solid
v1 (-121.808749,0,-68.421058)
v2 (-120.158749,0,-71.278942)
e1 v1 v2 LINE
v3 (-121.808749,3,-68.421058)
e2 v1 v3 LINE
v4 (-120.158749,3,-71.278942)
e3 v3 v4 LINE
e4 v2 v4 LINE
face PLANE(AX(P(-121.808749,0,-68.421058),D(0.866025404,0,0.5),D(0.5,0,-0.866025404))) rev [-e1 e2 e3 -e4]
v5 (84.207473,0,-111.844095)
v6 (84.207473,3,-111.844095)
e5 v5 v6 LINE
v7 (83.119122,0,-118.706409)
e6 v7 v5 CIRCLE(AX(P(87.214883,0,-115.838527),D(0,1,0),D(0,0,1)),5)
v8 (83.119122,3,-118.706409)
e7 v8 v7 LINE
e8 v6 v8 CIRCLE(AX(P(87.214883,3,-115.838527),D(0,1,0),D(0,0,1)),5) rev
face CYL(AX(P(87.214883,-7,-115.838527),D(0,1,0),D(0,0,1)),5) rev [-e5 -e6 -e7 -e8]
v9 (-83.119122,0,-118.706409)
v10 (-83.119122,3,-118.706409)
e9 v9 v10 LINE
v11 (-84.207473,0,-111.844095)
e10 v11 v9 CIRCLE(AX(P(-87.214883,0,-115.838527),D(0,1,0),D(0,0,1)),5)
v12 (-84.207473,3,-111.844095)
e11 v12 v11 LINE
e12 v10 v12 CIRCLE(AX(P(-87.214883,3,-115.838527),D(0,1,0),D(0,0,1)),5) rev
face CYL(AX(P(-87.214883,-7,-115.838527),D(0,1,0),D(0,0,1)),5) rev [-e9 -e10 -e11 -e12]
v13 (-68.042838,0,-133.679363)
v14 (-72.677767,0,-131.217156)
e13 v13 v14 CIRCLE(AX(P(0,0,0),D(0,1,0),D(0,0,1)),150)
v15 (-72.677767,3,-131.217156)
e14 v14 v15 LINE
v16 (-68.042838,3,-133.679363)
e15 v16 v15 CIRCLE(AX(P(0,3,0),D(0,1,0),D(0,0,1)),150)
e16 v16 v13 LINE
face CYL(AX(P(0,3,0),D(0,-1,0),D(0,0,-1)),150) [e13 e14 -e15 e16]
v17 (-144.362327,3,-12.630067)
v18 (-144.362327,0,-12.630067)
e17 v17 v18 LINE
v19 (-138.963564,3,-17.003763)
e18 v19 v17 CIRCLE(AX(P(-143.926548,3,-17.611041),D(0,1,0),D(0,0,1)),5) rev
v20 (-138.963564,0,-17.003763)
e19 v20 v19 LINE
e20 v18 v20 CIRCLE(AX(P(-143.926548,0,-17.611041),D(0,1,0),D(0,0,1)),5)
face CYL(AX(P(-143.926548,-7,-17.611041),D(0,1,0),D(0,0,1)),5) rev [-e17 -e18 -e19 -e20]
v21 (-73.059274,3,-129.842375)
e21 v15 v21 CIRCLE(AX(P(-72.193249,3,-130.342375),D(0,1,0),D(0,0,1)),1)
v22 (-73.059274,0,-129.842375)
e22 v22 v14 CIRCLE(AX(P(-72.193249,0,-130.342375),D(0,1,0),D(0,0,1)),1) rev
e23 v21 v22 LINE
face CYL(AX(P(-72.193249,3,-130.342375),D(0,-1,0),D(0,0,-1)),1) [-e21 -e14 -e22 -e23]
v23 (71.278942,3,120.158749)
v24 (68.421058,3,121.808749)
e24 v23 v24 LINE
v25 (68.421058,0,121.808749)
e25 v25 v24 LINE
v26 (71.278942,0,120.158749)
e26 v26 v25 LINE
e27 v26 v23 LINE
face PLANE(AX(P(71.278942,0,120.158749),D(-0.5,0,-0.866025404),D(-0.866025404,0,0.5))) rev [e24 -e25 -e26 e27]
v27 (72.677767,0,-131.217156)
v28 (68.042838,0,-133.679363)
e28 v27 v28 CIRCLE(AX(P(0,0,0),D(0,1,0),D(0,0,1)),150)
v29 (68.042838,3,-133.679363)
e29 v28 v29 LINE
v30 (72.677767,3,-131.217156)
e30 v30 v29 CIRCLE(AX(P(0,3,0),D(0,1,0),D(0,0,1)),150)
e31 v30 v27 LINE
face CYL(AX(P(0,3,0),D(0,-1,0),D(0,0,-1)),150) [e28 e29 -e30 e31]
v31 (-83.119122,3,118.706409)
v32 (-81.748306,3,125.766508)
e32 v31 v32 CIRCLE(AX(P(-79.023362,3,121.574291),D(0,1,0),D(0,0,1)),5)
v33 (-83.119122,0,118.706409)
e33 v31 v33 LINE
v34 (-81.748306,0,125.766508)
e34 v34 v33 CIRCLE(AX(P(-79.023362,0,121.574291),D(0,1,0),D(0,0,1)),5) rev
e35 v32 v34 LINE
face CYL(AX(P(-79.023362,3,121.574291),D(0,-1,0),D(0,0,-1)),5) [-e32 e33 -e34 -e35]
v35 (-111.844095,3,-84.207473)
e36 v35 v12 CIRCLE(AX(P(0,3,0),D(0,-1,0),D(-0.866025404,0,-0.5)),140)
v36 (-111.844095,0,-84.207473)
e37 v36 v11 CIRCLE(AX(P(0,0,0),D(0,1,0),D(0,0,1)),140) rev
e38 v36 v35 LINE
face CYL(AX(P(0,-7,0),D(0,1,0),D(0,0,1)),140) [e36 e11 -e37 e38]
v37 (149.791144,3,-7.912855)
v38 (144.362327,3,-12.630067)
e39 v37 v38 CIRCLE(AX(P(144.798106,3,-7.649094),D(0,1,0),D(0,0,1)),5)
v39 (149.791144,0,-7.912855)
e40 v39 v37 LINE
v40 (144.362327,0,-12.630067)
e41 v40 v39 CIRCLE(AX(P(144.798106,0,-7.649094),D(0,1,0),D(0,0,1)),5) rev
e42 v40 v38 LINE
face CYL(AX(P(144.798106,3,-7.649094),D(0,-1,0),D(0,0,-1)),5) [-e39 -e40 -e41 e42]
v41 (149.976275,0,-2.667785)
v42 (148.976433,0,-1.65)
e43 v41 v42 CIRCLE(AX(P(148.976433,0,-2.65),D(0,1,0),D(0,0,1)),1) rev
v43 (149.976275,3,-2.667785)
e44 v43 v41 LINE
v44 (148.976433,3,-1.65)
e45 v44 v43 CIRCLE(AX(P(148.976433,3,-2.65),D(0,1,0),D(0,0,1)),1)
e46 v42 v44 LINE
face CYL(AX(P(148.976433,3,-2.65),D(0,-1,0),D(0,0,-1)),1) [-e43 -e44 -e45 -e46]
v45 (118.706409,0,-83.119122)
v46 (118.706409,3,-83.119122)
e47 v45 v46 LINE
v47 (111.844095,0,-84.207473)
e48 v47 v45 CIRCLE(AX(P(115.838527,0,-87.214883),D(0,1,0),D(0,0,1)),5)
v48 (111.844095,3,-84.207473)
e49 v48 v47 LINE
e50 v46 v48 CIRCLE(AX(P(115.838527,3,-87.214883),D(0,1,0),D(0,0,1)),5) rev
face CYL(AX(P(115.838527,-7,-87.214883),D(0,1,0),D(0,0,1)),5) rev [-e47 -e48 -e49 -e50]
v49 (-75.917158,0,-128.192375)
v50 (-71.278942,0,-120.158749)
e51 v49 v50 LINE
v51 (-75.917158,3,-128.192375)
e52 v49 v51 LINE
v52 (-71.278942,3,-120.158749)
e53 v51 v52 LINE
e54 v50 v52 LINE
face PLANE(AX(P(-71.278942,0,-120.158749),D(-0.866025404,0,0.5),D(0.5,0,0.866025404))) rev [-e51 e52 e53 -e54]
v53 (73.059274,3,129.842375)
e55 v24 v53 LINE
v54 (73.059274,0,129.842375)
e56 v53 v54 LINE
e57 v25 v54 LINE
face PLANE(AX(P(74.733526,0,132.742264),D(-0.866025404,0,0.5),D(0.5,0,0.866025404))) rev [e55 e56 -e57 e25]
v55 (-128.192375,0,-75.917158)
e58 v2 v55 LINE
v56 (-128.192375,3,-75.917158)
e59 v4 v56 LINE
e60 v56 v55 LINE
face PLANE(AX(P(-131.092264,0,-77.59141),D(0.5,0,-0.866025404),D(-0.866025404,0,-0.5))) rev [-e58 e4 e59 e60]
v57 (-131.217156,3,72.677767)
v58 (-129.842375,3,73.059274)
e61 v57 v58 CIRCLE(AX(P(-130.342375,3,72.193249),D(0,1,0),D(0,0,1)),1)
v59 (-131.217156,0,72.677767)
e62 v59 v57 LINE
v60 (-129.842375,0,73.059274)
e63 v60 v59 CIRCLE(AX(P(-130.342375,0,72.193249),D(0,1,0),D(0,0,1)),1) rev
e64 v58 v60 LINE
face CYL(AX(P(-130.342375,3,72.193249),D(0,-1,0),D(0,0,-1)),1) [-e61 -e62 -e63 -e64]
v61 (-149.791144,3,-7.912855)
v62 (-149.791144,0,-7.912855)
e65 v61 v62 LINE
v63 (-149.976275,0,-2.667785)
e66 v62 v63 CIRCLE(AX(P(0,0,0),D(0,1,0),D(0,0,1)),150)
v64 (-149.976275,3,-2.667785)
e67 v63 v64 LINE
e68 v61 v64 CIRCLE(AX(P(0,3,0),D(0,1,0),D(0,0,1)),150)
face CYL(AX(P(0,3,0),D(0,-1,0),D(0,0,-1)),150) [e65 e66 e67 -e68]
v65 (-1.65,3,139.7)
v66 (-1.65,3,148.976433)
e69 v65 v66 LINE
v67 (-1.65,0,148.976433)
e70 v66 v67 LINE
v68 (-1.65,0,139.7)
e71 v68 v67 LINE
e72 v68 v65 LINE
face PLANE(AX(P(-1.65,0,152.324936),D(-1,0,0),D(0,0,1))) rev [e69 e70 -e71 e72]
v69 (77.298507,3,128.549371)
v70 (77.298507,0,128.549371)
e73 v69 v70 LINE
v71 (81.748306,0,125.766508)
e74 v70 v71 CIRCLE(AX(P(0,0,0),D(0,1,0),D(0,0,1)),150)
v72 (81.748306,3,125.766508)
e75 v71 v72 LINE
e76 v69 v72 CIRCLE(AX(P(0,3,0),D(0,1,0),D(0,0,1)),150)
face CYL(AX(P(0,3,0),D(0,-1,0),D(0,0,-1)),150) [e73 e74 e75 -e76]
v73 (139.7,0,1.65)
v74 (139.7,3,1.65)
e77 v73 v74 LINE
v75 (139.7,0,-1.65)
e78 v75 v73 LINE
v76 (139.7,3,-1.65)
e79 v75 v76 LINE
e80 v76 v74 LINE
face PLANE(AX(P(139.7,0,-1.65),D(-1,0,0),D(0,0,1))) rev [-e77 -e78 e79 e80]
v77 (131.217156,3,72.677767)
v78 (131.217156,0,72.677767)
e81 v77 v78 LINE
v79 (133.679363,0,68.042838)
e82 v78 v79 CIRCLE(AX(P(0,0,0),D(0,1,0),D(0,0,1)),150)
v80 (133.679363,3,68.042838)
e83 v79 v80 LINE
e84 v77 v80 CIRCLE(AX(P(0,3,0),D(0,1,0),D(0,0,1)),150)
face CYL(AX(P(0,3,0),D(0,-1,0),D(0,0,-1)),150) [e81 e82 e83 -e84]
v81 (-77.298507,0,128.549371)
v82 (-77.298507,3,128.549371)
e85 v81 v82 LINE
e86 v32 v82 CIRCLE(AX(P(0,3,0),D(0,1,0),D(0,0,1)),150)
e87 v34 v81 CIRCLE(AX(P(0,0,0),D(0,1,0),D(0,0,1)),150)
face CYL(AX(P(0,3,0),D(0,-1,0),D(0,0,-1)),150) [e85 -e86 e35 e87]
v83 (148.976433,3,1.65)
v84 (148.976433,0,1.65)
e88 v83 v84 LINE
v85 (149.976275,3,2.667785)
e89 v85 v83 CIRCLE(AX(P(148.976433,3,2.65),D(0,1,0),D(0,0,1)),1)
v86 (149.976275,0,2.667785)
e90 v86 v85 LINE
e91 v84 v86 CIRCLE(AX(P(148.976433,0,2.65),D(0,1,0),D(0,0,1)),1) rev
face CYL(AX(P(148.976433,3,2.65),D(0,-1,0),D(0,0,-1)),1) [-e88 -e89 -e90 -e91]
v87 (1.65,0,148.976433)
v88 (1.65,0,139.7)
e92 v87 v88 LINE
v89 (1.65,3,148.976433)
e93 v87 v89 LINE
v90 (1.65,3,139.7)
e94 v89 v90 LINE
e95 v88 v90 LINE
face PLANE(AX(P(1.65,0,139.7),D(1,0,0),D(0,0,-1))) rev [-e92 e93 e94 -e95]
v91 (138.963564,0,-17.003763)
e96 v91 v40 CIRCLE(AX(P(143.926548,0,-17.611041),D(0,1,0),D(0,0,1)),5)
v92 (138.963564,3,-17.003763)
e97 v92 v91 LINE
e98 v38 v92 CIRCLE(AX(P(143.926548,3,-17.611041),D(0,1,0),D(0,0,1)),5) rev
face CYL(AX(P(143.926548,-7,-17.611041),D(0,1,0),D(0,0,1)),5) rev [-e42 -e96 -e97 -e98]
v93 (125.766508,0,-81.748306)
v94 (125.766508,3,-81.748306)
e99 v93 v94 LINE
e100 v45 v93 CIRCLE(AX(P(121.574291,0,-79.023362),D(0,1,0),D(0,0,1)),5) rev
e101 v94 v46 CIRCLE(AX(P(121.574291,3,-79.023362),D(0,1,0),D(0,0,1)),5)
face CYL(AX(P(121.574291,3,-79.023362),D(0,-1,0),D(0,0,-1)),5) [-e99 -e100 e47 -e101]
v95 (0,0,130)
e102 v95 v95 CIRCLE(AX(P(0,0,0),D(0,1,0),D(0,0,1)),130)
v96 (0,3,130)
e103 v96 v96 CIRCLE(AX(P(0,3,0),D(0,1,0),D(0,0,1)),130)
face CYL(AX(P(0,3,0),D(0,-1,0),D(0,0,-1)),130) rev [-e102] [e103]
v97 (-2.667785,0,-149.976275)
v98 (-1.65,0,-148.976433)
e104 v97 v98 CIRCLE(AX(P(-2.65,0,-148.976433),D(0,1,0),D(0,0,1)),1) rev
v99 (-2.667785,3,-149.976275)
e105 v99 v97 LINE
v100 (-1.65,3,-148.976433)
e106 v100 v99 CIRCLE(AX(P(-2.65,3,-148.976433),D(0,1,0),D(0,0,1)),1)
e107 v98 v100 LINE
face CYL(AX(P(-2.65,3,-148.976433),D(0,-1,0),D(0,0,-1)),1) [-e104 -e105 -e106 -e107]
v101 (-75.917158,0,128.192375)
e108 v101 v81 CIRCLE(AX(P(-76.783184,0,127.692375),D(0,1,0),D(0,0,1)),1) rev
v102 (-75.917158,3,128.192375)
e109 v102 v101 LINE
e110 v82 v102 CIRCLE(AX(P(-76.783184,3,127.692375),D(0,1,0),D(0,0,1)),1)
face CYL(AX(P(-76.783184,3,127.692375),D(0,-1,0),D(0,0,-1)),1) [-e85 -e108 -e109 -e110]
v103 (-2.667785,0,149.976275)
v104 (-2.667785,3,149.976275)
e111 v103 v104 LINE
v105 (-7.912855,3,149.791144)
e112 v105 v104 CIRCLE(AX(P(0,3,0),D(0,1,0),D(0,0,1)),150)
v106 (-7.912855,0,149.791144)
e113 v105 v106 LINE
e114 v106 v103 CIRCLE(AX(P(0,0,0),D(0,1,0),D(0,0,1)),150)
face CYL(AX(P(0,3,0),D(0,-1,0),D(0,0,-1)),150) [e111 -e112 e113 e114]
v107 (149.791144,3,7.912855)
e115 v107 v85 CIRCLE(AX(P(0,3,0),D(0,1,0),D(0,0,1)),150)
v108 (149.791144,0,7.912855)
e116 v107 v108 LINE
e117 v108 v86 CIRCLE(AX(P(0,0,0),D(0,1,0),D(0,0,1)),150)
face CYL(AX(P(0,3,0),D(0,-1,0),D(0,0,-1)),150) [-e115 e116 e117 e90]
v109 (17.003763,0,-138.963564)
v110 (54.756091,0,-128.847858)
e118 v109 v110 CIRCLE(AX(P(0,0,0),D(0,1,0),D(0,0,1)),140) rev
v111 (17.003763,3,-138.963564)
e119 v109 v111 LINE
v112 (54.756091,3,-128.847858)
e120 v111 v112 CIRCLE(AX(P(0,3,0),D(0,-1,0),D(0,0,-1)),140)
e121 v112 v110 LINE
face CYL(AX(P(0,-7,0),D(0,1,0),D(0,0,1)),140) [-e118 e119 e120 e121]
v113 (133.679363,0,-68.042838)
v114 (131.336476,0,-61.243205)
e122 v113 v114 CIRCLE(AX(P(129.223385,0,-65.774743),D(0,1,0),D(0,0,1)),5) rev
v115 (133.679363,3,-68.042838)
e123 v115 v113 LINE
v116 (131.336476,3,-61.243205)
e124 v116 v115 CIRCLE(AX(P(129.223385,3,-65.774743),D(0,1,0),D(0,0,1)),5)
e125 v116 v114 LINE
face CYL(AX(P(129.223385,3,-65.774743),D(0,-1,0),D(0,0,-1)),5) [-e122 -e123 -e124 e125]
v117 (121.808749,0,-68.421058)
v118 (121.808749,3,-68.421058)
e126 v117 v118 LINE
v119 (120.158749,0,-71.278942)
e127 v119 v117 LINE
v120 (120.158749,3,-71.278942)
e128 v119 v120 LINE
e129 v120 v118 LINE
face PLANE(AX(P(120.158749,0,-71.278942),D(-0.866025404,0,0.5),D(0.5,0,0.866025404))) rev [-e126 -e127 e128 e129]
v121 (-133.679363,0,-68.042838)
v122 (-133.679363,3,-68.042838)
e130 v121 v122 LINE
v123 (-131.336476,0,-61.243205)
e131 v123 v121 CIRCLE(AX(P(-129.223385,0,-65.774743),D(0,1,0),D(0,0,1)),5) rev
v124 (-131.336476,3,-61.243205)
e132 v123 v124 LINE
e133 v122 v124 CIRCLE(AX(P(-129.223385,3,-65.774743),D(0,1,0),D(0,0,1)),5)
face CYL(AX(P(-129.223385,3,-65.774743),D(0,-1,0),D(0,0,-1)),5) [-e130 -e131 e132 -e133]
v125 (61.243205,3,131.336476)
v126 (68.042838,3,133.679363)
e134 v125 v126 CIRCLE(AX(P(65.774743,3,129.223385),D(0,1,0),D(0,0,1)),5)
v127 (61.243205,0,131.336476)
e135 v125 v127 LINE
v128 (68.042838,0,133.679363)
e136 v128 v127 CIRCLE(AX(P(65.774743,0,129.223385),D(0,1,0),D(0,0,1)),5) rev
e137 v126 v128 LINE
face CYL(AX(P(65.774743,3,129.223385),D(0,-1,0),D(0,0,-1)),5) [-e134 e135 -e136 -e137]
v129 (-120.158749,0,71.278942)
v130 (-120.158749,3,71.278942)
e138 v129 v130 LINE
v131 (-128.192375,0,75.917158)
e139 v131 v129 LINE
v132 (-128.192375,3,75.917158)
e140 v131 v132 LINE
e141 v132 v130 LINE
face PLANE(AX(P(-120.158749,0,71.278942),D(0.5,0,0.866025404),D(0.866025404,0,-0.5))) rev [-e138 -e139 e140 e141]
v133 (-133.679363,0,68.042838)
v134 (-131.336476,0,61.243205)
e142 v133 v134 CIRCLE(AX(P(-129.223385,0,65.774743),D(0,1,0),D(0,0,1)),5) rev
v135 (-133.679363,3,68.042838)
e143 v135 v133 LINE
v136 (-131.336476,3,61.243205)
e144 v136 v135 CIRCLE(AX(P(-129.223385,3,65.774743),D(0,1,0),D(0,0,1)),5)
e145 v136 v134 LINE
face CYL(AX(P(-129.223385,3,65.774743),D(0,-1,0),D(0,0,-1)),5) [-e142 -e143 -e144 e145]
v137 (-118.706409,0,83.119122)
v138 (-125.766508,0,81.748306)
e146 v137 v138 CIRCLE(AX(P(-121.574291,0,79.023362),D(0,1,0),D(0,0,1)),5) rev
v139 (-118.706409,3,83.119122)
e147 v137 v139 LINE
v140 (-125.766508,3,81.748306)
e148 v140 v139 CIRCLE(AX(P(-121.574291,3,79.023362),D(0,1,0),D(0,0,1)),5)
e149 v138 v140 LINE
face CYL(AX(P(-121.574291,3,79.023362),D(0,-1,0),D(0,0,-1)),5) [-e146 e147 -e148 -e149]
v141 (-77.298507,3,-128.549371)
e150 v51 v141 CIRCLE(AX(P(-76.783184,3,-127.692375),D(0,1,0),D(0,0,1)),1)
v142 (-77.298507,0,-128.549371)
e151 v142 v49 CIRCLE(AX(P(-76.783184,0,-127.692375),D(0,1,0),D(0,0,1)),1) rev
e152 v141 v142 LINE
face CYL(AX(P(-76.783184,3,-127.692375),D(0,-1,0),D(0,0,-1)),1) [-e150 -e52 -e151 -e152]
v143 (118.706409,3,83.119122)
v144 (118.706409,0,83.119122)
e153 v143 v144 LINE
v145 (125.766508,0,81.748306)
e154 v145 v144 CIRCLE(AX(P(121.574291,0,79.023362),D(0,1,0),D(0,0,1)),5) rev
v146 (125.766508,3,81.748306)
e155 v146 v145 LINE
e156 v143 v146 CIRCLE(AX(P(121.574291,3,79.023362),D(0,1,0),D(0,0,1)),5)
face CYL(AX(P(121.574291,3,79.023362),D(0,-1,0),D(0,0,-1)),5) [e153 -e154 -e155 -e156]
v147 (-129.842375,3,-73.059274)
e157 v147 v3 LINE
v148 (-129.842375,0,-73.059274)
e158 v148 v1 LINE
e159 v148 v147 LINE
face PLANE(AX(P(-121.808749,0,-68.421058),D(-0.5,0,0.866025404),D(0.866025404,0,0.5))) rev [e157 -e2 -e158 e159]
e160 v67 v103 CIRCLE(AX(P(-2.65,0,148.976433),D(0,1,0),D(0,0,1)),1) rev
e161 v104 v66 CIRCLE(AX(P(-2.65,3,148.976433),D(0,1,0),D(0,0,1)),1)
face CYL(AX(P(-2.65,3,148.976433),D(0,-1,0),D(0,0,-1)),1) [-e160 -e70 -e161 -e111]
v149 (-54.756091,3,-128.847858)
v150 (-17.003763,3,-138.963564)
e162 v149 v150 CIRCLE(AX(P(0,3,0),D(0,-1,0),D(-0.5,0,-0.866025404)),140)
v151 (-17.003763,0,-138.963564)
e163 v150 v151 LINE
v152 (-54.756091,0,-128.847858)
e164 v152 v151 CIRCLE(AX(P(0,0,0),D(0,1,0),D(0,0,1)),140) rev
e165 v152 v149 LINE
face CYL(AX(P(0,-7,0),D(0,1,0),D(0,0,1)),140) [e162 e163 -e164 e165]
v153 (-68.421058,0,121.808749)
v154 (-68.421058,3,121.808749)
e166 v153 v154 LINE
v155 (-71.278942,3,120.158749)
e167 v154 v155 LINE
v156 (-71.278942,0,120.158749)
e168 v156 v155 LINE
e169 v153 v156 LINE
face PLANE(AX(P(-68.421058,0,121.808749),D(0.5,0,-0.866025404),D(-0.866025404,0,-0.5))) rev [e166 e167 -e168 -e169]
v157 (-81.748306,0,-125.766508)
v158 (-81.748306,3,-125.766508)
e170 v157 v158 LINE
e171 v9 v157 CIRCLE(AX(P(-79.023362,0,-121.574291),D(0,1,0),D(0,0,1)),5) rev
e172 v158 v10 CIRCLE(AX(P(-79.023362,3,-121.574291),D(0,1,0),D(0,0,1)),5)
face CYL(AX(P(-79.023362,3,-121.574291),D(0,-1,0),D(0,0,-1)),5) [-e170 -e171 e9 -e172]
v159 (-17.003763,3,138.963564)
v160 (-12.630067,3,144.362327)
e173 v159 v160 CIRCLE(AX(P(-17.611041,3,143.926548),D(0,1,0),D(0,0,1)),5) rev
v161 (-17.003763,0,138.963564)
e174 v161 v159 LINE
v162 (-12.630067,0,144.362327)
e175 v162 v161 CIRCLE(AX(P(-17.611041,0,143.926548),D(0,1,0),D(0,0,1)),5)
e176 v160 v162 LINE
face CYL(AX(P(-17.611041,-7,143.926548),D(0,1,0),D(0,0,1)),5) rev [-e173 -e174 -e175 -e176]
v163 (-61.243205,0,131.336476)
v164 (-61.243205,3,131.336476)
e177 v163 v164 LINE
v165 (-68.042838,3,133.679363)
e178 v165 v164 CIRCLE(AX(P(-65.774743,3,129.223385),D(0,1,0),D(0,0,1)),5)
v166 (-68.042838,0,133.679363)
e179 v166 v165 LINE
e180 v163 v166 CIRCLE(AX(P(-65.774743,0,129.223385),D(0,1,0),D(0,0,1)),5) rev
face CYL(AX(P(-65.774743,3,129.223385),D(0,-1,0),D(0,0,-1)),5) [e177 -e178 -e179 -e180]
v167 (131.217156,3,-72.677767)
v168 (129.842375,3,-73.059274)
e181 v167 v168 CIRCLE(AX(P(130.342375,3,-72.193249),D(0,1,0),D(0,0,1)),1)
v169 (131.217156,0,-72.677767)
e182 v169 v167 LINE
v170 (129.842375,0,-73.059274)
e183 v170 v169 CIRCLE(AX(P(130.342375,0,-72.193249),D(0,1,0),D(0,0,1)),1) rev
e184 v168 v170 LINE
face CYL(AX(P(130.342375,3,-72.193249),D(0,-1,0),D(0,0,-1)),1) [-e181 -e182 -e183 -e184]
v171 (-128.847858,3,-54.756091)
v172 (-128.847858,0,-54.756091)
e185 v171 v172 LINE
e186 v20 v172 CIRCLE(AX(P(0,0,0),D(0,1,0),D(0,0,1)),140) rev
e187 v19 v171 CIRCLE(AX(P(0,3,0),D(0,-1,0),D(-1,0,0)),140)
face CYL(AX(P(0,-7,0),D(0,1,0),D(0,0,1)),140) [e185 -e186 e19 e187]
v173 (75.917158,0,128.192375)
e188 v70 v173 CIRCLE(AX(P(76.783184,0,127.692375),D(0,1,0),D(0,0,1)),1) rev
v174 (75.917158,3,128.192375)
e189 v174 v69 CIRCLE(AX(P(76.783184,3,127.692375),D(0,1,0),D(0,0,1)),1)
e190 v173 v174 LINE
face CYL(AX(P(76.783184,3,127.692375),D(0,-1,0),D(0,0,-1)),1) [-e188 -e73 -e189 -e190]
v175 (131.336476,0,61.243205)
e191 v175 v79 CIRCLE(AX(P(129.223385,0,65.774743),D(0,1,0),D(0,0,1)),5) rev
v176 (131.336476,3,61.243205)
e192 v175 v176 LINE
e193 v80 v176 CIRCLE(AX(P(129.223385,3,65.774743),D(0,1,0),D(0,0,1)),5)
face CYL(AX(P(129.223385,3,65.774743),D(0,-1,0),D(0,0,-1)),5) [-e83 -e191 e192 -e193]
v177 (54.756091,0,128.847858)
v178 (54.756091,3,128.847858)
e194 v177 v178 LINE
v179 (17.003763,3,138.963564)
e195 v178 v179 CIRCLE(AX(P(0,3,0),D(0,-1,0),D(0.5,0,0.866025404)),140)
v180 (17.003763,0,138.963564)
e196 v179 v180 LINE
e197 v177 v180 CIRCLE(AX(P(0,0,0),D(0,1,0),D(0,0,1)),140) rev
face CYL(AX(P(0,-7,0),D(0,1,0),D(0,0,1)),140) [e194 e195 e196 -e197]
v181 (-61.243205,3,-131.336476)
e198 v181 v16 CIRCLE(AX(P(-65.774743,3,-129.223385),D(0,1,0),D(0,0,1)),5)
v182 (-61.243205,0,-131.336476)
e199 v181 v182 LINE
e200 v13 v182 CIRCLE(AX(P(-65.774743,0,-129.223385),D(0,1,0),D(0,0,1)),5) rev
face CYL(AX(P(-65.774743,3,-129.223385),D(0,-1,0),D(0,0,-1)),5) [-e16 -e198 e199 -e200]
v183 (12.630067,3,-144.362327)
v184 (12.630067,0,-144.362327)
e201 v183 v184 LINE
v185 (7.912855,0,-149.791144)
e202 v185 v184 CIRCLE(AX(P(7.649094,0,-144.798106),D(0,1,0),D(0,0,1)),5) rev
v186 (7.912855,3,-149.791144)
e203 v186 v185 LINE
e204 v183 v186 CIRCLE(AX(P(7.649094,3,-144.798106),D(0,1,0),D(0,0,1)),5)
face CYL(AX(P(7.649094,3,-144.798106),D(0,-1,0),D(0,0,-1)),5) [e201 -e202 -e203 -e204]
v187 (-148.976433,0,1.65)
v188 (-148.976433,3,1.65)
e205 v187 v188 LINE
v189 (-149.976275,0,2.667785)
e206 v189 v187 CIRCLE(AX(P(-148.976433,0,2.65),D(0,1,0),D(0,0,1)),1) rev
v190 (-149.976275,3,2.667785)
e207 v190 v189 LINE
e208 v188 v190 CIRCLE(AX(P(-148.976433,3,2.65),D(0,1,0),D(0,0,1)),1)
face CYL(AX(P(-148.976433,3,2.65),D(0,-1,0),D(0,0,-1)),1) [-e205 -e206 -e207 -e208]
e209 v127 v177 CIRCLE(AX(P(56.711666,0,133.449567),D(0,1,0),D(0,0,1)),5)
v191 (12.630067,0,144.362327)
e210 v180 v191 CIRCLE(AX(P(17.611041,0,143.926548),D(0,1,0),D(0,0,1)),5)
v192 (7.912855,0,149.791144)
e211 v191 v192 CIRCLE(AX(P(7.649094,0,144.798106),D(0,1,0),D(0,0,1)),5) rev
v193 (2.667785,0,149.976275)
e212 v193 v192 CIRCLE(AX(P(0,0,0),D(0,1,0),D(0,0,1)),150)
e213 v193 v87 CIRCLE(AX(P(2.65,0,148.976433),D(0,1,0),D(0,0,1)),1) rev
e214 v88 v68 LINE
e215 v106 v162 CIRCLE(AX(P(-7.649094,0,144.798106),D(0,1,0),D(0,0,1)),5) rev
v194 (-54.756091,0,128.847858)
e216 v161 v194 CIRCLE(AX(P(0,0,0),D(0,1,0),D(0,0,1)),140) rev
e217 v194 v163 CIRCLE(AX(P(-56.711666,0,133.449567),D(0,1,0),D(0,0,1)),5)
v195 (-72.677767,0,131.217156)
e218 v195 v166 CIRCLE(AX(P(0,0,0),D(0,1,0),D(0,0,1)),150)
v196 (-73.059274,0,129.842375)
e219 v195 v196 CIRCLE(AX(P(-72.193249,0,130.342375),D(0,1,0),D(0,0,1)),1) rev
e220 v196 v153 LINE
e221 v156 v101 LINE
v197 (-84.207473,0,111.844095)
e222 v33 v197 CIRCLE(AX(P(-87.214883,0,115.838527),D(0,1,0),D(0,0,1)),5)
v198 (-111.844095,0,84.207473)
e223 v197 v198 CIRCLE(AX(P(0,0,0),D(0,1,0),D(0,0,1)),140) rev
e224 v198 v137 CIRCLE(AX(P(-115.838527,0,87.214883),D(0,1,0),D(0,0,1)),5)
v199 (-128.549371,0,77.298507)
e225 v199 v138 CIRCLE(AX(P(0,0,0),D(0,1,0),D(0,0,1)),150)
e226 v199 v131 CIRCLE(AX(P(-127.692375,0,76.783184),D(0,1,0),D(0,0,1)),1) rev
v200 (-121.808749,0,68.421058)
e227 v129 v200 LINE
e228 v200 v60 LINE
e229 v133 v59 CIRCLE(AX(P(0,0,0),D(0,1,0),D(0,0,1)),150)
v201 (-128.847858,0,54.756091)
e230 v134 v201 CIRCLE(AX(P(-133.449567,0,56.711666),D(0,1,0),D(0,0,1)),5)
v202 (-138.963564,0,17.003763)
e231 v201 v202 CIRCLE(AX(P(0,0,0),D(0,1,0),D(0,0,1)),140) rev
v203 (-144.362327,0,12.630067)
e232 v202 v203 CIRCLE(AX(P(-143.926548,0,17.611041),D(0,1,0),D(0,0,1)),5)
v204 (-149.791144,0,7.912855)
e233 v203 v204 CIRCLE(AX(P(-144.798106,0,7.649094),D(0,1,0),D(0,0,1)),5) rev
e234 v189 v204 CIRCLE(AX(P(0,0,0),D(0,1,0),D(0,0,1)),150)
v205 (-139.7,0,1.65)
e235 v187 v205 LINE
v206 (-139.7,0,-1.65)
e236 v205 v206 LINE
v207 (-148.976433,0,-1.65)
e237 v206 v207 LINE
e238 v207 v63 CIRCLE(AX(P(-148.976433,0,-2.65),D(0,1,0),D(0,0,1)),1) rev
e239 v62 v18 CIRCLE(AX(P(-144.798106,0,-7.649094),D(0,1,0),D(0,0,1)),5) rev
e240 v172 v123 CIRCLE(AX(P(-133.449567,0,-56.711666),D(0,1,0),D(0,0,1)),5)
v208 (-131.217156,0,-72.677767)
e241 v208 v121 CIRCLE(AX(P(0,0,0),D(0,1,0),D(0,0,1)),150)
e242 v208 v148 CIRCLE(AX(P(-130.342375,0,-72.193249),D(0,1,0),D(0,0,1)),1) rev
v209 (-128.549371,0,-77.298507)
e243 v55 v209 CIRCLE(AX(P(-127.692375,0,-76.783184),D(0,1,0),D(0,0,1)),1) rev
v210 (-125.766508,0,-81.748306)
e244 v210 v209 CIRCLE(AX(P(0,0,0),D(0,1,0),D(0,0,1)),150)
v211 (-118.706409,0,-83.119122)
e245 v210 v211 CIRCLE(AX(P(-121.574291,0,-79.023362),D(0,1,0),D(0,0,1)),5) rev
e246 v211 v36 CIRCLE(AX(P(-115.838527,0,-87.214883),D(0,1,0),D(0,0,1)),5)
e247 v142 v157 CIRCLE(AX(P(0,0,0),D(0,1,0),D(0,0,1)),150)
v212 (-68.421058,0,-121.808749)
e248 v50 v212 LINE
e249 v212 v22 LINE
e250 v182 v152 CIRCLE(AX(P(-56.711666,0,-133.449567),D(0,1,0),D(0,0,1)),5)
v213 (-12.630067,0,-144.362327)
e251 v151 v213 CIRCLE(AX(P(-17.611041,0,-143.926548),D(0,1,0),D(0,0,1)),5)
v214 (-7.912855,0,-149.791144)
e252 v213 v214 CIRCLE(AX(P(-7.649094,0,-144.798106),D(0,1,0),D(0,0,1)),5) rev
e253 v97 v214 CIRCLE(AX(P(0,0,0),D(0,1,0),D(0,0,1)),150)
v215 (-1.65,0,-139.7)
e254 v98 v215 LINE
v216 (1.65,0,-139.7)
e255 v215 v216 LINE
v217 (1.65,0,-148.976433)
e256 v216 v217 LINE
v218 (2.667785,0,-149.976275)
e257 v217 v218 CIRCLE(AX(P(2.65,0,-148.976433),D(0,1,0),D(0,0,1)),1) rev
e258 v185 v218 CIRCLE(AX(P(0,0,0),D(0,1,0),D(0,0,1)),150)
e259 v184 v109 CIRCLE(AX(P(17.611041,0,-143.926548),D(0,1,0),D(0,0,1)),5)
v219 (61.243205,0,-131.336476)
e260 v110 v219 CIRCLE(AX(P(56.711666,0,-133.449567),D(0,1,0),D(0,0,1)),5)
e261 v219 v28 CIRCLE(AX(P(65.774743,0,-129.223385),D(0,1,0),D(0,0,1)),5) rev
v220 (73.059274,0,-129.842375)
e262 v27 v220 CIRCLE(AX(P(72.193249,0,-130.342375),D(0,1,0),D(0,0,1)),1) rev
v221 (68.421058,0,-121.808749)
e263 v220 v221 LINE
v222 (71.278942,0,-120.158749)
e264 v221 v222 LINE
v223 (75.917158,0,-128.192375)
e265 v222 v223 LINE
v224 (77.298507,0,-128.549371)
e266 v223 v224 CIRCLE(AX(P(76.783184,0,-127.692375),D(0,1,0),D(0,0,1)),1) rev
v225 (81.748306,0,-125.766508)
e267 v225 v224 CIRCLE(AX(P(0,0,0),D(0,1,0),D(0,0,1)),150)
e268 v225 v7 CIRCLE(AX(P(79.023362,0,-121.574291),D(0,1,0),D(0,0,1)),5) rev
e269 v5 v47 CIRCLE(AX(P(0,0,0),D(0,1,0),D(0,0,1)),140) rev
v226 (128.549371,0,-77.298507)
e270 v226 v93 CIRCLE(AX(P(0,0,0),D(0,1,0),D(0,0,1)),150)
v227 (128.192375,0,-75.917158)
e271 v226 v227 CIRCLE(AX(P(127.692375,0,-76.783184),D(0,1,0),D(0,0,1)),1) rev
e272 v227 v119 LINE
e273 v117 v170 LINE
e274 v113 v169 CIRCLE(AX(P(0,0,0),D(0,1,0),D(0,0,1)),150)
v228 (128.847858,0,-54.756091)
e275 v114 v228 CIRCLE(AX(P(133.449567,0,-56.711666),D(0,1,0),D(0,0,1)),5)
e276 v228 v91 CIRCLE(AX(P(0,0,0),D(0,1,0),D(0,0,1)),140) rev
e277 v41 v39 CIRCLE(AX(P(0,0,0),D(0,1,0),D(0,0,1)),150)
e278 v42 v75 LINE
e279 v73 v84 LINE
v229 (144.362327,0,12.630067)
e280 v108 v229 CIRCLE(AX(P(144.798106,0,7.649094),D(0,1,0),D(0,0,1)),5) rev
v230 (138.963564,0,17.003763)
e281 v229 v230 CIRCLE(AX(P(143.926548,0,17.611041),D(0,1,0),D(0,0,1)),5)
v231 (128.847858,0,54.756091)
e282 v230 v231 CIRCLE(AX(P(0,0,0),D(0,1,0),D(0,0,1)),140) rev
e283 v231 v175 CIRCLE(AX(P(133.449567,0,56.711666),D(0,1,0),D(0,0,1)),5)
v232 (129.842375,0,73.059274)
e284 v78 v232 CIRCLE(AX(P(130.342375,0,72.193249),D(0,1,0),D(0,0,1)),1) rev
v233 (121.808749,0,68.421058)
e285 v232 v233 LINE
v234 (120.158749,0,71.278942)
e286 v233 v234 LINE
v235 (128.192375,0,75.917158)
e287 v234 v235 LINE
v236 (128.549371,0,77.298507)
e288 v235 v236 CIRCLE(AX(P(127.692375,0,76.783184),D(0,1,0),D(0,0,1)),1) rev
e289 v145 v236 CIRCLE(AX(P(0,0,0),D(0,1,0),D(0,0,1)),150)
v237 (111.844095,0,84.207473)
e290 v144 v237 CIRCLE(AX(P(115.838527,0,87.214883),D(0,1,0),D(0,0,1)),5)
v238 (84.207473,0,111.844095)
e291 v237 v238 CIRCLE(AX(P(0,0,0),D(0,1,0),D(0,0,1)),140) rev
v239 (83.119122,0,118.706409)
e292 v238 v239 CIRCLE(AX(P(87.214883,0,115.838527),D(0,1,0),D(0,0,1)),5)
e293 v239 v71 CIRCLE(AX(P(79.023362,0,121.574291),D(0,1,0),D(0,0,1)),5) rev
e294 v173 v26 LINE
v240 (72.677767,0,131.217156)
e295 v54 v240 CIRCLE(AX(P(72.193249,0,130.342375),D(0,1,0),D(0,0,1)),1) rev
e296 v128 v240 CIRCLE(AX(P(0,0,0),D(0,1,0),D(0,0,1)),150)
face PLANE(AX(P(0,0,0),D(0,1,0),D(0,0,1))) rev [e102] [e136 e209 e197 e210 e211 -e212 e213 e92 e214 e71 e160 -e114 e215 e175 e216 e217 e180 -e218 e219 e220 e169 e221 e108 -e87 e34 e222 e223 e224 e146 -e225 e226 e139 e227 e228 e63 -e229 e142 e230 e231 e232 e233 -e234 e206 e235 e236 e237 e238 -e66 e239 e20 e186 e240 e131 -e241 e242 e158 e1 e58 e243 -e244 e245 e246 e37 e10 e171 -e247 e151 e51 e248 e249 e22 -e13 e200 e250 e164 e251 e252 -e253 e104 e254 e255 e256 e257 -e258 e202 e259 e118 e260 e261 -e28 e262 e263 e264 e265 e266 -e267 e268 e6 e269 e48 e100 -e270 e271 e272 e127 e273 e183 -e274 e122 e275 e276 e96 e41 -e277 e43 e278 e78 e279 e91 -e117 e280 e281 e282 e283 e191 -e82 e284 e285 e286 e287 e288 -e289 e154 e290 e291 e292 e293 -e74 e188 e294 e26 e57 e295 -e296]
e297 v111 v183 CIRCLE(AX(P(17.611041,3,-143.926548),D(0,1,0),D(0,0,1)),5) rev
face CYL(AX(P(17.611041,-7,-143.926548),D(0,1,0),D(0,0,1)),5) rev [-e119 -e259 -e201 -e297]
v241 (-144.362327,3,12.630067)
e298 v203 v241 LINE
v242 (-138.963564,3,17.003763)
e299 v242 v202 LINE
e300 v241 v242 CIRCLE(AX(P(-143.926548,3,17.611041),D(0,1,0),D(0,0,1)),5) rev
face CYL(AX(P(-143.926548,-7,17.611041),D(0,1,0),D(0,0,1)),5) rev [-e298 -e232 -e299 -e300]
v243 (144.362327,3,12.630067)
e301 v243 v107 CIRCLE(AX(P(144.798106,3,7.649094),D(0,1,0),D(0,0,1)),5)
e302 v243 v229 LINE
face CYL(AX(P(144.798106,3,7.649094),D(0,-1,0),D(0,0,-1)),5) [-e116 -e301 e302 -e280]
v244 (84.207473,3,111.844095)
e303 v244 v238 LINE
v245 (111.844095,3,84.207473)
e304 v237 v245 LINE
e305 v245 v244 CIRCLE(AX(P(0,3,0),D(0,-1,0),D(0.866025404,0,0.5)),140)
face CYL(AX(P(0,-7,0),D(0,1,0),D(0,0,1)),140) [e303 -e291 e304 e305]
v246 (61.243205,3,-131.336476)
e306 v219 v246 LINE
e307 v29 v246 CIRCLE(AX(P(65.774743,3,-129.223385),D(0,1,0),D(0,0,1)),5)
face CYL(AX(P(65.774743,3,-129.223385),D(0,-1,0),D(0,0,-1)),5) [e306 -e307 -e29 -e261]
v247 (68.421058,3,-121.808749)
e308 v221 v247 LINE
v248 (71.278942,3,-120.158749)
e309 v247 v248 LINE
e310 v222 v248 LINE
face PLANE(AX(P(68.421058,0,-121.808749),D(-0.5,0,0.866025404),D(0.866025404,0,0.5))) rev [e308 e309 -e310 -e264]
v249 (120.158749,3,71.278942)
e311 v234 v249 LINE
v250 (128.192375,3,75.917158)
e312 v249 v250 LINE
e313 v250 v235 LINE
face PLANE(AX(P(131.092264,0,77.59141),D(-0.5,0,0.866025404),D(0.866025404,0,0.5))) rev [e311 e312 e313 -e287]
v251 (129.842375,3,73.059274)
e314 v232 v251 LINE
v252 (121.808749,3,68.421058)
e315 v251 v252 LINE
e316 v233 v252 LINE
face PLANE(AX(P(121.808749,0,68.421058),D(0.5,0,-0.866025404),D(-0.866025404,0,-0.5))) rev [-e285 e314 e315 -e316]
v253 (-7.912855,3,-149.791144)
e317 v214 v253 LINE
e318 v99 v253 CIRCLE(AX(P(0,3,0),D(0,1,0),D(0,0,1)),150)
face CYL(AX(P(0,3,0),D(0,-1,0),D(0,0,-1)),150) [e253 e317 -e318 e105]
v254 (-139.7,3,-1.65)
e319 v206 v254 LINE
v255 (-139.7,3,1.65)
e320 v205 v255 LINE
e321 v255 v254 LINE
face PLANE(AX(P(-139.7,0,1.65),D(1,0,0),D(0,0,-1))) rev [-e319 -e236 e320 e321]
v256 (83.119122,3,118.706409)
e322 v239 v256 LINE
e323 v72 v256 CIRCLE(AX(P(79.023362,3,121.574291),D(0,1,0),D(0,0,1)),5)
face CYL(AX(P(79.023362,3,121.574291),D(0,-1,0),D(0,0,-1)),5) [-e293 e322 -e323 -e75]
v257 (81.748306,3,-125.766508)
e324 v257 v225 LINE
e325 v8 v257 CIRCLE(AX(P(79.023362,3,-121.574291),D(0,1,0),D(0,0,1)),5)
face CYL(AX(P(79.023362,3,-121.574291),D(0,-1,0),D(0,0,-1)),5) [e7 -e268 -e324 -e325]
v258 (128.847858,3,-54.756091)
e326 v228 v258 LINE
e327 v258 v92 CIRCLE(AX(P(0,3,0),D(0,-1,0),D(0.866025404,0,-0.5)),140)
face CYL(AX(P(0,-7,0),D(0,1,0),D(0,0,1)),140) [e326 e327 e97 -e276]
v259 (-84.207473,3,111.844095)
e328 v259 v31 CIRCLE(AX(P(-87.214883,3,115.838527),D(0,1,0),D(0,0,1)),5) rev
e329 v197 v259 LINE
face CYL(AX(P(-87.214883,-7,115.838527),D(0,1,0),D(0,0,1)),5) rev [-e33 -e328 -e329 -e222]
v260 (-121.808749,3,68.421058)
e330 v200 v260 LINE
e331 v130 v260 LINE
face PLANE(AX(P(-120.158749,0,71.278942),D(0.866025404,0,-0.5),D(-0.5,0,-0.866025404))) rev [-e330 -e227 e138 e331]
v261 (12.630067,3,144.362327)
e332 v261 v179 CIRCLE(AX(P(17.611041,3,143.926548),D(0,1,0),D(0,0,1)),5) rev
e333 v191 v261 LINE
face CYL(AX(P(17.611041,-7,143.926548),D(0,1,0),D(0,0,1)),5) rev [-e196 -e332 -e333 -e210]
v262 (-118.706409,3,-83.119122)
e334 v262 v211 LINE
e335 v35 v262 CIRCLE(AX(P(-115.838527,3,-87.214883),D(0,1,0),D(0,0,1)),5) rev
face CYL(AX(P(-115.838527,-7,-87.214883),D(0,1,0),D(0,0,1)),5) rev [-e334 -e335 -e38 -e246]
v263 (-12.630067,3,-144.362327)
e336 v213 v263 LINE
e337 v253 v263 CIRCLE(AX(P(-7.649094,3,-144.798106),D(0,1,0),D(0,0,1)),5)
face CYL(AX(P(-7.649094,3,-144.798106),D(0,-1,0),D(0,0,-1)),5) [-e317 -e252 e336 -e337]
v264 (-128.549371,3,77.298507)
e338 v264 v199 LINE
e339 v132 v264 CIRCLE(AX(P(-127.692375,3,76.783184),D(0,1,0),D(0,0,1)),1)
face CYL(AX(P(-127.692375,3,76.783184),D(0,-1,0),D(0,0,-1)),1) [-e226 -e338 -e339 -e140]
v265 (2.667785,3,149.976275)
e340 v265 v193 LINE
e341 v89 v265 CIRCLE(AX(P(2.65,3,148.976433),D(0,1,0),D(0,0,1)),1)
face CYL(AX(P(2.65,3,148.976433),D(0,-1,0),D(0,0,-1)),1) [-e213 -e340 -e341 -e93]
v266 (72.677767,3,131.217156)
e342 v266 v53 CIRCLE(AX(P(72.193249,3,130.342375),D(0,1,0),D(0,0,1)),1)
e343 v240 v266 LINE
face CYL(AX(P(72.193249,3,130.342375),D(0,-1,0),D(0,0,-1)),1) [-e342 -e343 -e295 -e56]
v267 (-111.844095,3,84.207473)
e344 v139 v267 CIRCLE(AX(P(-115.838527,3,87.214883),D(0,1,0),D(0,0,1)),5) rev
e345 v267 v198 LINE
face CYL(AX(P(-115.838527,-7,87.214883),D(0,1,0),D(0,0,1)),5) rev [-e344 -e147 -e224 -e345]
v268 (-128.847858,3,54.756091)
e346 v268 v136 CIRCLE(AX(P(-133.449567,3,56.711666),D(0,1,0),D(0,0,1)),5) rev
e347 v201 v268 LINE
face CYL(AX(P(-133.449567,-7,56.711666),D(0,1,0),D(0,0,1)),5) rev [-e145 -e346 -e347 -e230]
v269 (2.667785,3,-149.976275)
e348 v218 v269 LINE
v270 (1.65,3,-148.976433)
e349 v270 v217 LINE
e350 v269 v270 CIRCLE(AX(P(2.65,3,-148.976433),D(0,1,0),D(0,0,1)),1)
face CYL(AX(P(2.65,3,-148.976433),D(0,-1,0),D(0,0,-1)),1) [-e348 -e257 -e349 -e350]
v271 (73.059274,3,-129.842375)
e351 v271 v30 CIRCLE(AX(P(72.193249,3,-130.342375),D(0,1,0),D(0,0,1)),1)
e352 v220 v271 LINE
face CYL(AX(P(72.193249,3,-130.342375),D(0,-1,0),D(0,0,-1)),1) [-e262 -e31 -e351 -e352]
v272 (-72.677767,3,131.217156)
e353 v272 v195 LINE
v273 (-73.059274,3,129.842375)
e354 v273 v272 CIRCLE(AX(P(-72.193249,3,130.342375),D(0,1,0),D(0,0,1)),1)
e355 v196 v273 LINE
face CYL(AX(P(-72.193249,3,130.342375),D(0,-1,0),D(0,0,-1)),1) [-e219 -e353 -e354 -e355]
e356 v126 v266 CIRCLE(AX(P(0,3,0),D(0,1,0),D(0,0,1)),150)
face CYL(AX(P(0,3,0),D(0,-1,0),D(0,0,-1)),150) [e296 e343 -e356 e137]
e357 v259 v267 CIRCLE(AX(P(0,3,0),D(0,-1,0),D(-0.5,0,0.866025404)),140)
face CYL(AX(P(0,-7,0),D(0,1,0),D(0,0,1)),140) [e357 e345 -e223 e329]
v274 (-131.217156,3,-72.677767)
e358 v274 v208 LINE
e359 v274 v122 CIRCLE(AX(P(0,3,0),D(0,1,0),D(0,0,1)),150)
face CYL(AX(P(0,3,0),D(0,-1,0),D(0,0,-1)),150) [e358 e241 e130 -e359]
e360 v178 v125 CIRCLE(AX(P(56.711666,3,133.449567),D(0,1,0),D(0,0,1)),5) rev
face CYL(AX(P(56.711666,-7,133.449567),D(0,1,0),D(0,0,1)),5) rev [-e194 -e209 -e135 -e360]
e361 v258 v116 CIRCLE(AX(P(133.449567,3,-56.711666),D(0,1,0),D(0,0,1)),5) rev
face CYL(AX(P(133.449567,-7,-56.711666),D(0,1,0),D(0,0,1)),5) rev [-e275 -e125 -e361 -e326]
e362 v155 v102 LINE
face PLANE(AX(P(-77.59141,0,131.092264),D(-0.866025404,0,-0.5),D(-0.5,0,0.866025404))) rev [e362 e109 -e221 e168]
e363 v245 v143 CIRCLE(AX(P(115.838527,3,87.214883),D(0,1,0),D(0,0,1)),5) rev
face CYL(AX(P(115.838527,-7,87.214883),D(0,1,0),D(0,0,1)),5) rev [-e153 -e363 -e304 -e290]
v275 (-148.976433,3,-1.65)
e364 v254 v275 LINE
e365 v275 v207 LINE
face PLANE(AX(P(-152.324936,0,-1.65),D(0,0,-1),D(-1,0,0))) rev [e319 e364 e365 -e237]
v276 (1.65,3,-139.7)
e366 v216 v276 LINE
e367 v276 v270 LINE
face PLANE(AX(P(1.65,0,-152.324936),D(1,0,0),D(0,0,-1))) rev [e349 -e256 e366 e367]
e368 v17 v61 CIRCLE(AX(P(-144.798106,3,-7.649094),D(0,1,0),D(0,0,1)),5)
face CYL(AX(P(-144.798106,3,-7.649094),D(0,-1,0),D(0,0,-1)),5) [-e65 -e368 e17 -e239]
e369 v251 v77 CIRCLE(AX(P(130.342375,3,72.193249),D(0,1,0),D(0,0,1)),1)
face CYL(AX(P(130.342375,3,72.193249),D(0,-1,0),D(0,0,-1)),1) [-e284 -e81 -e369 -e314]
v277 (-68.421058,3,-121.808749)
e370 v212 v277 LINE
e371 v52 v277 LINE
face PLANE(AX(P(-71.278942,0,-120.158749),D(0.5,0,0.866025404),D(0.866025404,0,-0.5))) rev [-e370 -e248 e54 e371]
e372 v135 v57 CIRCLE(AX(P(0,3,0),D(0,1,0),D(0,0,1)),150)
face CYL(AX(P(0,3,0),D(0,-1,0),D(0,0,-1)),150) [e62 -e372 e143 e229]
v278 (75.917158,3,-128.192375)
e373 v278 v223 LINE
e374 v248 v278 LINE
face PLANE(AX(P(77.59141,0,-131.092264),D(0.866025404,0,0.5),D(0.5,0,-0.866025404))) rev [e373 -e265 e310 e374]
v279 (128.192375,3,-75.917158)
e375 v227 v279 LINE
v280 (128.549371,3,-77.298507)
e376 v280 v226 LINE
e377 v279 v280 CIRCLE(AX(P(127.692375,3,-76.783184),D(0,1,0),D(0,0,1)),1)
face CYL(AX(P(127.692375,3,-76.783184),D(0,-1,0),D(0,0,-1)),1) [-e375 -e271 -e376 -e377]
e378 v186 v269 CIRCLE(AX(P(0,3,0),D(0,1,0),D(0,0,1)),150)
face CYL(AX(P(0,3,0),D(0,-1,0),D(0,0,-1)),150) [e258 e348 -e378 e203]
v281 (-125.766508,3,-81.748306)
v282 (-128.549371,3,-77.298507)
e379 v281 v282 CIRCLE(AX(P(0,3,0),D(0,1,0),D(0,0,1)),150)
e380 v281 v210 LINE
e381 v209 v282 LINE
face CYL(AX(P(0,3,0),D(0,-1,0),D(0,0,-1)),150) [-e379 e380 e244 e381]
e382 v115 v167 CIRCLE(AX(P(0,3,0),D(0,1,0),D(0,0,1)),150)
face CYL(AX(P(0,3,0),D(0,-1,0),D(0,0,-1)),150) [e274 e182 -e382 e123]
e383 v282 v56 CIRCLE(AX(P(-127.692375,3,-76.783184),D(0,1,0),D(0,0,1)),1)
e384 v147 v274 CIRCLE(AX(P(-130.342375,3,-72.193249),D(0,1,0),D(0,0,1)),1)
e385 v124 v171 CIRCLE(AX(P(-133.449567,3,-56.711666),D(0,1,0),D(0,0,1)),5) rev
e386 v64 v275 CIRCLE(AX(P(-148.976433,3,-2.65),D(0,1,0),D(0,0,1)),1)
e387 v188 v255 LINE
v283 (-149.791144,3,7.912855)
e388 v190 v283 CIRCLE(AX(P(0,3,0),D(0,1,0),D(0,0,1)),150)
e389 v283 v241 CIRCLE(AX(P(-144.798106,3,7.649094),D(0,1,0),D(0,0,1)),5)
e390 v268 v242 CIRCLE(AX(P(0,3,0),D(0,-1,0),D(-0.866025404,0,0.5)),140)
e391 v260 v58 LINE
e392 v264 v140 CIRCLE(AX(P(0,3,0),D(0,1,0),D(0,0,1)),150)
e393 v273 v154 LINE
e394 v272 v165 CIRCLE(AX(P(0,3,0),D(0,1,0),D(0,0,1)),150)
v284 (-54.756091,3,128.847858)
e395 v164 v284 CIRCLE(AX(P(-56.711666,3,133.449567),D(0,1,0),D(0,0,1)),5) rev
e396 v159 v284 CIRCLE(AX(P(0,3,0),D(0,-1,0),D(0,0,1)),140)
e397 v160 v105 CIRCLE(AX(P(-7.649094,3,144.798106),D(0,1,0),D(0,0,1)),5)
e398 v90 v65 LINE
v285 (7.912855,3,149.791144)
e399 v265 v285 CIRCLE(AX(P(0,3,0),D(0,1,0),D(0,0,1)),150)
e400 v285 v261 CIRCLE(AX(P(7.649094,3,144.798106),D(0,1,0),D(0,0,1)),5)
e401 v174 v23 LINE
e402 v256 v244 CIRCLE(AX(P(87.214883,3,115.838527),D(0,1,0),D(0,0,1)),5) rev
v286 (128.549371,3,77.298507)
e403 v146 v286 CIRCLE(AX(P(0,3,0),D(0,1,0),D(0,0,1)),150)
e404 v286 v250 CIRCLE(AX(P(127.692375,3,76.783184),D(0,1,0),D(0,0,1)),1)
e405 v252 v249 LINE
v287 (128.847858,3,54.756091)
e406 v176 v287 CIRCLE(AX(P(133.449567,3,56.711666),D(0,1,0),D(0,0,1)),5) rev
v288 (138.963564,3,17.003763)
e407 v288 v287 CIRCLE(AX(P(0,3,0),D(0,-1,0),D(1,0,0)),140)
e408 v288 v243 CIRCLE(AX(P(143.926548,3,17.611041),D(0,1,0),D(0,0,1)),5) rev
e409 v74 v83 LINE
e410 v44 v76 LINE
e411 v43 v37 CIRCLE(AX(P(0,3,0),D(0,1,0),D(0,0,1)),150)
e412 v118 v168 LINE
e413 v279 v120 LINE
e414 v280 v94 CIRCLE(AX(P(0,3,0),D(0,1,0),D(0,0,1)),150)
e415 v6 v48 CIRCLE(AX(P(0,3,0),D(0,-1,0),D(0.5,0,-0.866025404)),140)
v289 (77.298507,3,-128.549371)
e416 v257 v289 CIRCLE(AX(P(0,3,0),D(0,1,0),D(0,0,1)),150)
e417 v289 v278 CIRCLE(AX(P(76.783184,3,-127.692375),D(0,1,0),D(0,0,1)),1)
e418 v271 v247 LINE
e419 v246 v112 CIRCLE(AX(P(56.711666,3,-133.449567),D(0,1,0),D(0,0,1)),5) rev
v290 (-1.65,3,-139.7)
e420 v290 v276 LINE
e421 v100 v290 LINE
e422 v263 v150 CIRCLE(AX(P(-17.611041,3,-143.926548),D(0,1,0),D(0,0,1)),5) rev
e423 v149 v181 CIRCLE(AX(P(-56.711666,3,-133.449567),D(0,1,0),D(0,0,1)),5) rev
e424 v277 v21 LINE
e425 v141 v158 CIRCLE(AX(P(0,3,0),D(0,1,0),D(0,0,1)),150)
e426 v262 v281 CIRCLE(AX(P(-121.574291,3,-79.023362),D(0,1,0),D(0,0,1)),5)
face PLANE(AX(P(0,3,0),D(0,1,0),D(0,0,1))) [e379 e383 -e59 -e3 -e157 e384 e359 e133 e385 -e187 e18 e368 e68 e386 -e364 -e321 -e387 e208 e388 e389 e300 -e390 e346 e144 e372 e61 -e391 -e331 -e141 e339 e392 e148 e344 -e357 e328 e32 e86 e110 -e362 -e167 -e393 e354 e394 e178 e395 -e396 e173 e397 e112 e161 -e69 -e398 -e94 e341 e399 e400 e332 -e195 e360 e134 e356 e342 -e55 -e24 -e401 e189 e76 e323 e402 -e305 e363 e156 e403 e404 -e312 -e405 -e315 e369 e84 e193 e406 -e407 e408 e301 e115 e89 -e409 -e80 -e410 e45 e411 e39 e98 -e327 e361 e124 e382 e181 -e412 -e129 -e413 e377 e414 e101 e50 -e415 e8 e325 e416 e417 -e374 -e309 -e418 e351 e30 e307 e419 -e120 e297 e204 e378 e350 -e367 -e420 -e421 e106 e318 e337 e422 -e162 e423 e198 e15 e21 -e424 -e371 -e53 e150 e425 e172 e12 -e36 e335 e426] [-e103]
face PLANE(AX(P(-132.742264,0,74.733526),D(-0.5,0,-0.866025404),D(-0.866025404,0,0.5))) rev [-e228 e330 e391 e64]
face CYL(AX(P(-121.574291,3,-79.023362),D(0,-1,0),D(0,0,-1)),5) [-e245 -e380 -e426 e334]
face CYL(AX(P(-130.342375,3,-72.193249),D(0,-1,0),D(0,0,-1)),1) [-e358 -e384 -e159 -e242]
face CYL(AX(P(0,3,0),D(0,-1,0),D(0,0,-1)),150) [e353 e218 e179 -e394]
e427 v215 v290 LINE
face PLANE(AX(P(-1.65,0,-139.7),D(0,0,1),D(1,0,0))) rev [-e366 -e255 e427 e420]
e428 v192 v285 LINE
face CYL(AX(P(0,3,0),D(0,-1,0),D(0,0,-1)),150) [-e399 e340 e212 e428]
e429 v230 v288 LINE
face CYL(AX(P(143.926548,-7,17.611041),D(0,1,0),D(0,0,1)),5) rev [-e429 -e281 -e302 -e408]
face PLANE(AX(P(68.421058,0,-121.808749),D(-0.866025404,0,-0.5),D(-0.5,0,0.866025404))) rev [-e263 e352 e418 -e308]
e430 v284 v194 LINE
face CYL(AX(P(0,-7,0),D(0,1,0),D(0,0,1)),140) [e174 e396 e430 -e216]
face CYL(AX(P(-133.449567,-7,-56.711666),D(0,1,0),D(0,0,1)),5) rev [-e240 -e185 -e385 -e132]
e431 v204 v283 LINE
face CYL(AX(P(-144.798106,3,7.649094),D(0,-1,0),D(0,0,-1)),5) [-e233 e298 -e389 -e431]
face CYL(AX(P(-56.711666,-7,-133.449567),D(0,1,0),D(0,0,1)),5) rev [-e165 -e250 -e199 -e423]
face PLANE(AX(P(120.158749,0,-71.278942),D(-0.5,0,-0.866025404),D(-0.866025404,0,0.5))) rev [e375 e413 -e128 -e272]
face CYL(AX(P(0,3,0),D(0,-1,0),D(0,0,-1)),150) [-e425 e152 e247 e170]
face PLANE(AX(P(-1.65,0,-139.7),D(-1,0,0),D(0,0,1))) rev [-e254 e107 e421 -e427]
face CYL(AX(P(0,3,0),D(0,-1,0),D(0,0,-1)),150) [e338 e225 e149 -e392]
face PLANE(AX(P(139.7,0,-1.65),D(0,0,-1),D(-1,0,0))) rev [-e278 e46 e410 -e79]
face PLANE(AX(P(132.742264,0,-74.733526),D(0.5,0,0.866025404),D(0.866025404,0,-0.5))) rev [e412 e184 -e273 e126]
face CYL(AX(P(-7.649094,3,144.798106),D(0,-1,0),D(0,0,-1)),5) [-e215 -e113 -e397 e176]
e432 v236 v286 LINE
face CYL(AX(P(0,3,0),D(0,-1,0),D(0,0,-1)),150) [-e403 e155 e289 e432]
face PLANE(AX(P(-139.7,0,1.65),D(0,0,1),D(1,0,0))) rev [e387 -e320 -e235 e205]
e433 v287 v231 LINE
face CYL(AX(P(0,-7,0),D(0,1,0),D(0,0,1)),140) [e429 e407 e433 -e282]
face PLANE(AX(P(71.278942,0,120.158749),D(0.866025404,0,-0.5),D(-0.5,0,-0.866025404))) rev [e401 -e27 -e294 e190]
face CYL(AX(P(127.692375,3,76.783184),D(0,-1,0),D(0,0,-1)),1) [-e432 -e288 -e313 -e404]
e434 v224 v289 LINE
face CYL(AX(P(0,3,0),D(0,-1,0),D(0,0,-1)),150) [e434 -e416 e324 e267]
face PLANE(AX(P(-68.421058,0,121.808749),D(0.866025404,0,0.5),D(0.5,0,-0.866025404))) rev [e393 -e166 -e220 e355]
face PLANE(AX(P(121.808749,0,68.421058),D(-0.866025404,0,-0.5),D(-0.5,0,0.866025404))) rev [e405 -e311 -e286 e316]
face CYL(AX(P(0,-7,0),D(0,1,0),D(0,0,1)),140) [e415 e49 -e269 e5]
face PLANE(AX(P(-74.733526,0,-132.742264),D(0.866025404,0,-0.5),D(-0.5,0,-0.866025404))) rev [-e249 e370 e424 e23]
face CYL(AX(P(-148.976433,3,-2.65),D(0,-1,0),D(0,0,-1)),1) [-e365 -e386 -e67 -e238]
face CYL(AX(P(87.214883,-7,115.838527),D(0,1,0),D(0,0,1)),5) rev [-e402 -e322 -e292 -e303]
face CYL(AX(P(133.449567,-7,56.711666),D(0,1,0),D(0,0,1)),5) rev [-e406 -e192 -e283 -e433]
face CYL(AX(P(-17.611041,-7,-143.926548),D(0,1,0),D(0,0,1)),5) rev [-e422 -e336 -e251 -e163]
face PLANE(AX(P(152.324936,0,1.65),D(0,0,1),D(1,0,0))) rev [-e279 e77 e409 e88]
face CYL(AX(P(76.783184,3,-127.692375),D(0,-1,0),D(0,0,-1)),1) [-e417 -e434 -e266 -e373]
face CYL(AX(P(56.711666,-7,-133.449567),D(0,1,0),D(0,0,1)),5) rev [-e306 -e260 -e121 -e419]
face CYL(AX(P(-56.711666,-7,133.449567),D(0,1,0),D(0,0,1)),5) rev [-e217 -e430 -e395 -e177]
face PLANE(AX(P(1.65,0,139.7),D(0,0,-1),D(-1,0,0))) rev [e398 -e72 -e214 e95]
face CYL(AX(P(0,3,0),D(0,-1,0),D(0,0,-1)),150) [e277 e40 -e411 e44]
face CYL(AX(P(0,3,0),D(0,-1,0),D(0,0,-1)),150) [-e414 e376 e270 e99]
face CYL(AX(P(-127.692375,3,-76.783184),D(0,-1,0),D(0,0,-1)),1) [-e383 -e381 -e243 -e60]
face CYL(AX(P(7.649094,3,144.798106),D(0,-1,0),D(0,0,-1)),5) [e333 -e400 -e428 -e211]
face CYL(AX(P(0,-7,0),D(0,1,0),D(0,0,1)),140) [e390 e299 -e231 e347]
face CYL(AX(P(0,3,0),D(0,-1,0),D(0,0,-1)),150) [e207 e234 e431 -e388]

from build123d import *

# Parameters (mm, degrees)
SKETCH1_R                = 150
SKETCH1_R_2              = 130
BOSS_EXTRUDE1_DEPTH      = 3
SKETCH2_W                = 3.3
SKETCH2_H                = 12.624935537
CUT_EXTRUDE1_DEPTH       = 3
FILLET1_R                = 1
CIRPATTERN1_COUNT        = 12
FILLET1_OF_CIRPATTERN1_R = 1
CUT_EXTRUDE2_START       = -10
CUT_EXTRUDE2_DEPTH       = 10
FILLET2_R                = 5
CIRPATTERN2_COUNT        = 12
FILLET2_OF_CIRPATTERN2_R = 5


with BuildPart() as part:
    # Sketch1 → Boss-Extrude1 (new body)
    with BuildSketch(Plane(origin=(0, 0, 0), x_dir=(1, 0, 0), z_dir=(0, 1, 0))):
        with Locations(Location((0, 0, 0), (0, 0, 270))):
            Circle(SKETCH1_R)
        with Locations(Location((0, 0, 0), (0, 0, 270))):
            Circle(SKETCH1_R_2, mode=Mode.SUBTRACT)
    extrude(amount=BOSS_EXTRUDE1_DEPTH)

    # Sketch2 → Cut-Extrude1 (cut)
    with BuildSketch(Plane(origin=(0, 3, 0), x_dir=(1, 0, 0), z_dir=(0, 1, 0))):
        with Locations((0, 146.012467769)):
            Rectangle(SKETCH2_W, SKETCH2_H)
    cut_extrude1 = extrude(amount=-CUT_EXTRUDE1_DEPTH, mode=Mode.SUBTRACT)

    # Fillet1
    fillet1_edges = [part.edges().sort_by_distance(p)[0] for p in [
        (-1.65, 1.5, -149.990924725),
        (1.65, 1.5, -149.990924725),
    ]]
    fillet(fillet1_edges, radius=FILLET1_R)

    # CirPattern1: Cut-Extrude1 ×12 about axis
    cirpattern1_axis = Axis((0, 0, 0), (0, 1, 0))
    for i in range(1, CIRPATTERN1_COUNT):
        add(cut_extrude1.rotate(cirpattern1_axis, i * 360 / CIRPATTERN1_COUNT), mode=Mode.SUBTRACT)

    # Fillet1 of CirPattern1
    fillet1_of_cirpattern1_edges = [part.edges().sort_by_distance(p)[0] for p in [
        (-76.424404279, 1.5, -129.070951149),
        (-73.566520446, 1.5, -130.720951149),
        (-130.720951149, 1.5, -73.566520446),
        (-129.070951149, 1.5, -76.424404279),
        (-149.990924725, 1.5, 1.65),
        (-149.990924725, 1.5, -1.65),
        (-129.070951149, 1.5, 76.424404279),
        (-130.720951149, 1.5, 73.566520446),
        (-73.566520446, 1.5, 130.720951149),
        (-76.424404279, 1.5, 129.070951149),
        (1.65, 1.5, 149.990924725),
        (-1.65, 1.5, 149.990924725),
        (76.424404279, 1.5, 129.070951149),
        (73.566520446, 1.5, 130.720951149),
        (130.720951149, 1.5, 73.566520446),
        (129.070951149, 1.5, 76.424404279),
        (149.990924725, 1.5, -1.65),
        (149.990924725, 1.5, 1.65),
        (129.070951149, 1.5, -76.424404279),
        (130.720951149, 1.5, -73.566520446),
        (73.566520446, 1.5, -130.720951149),
        (76.424404279, 1.5, -129.070951149),
    ]]
    fillet(fillet1_of_cirpattern1_edges, radius=FILLET1_OF_CIRPATTERN1_R)

    # Sketch3 → Cut-Extrude2 (cut)
    with BuildSketch(Plane(origin=(0, 3, 0), x_dir=(1, 0, 0), z_dir=(0, 1, 0)).offset(CUT_EXTRUDE2_START)):
        with BuildLine():
            Line((12.201803985, 139.467257733), (13.073361412, 149.429204714))
            ThreePointArc((13.073361412, 149.429204714), (38.822856765, 144.888873943), (63.392739261, 135.946168055))
            Line((63.392739261, 135.946168055), (59.166556644, 126.883090185))
            ThreePointArc((59.166556644, 126.883090185), (36.234666314, 135.22961568), (12.201803985, 139.467257733))
        make_face()
    cut_extrude2 = extrude(amount=CUT_EXTRUDE2_DEPTH, mode=Mode.SUBTRACT)

    # Fillet2
    fillet2_edges = [part.edges().sort_by_distance(p)[0] for p in [
        (63.392739261, 1.5, -135.946168055),
        (13.073361412, 1.5, -149.429204714),
        (12.201803985, 1.5, -139.467257733),
        (59.166556644, 1.5, -126.883090185),
    ]]
    fillet(fillet2_edges, radius=FILLET2_R - 0.0001)  # a hair under: the kernel refuses the full size

    # CirPattern2: Cut-Extrude2 ×12 about axis
    cirpattern2_axis = Axis((0, 0, 0), (0, 1, 0))
    for i in range(1, CIRPATTERN2_COUNT):
        add(cut_extrude2.rotate(cirpattern2_axis, i * 360 / CIRPATTERN2_COUNT), mode=Mode.SUBTRACT)

    # Fillet2 of CirPattern2
    fillet2_of_cirpattern2_edges = [part.edges().sort_by_distance(p)[0] for p in [
        (-13.073361412, 1.5, -149.429204714),
        (-63.392739261, 1.5, -135.946168055),
        (-59.166556644, 1.5, -126.883090185),
        (-12.201803985, 1.5, -139.467257733),
        (-86.036465453, 1.5, -122.872806643),
        (-122.872806643, 1.5, -86.036465453),
        (-114.6812862, 1.5, -80.300701089),
        (-80.300701089, 1.5, -114.6812862),
        (-135.946168055, 1.5, -63.392739261),
        (-149.429204714, 1.5, -13.073361412),
        (-139.467257733, 1.5, -12.201803985),
        (-126.883090185, 1.5, -59.166556644),
        (-149.429204714, 1.5, 13.073361412),
        (-135.946168055, 1.5, 63.392739261),
        (-126.883090185, 1.5, 59.166556644),
        (-139.467257733, 1.5, 12.201803985),
        (-122.872806643, 1.5, 86.036465453),
        (-86.036465453, 1.5, 122.872806643),
        (-80.300701089, 1.5, 114.6812862),
        (-114.6812862, 1.5, 80.300701089),
        (-63.392739261, 1.5, 135.946168055),
        (-13.073361412, 1.5, 149.429204714),
        (-12.201803985, 1.5, 139.467257733),
        (-59.166556644, 1.5, 126.883090185),
        (13.073361412, 1.5, 149.429204714),
        (63.392739261, 1.5, 135.946168055),
        (59.166556644, 1.5, 126.883090185),
        (12.201803985, 1.5, 139.467257733),
        (86.036465453, 1.5, 122.872806643),
        (122.872806643, 1.5, 86.036465453),
        (114.6812862, 1.5, 80.300701089),
        (80.300701089, 1.5, 114.6812862),
        (135.946168055, 1.5, 63.392739261),
        (149.429204714, 1.5, 13.073361412),
        (139.467257733, 1.5, 12.201803985),
        (126.883090185, 1.5, 59.166556644),
        (149.429204714, 1.5, -13.073361412),
        (135.946168055, 1.5, -63.392739261),
        (126.883090185, 1.5, -59.166556644),
        (139.467257733, 1.5, -12.201803985),
        (122.872806643, 1.5, -86.036465453),
        (86.036465453, 1.5, -122.872806643),
        (80.300701089, 1.5, -114.6812862),
        (114.6812862, 1.5, -80.300701089),
    ]]
    fillet(fillet2_of_cirpattern2_edges, radius=FILLET2_OF_CIRPATTERN2_R - 0.0001)  # a hair under: the kernel refuses the full size


solid = part.part
